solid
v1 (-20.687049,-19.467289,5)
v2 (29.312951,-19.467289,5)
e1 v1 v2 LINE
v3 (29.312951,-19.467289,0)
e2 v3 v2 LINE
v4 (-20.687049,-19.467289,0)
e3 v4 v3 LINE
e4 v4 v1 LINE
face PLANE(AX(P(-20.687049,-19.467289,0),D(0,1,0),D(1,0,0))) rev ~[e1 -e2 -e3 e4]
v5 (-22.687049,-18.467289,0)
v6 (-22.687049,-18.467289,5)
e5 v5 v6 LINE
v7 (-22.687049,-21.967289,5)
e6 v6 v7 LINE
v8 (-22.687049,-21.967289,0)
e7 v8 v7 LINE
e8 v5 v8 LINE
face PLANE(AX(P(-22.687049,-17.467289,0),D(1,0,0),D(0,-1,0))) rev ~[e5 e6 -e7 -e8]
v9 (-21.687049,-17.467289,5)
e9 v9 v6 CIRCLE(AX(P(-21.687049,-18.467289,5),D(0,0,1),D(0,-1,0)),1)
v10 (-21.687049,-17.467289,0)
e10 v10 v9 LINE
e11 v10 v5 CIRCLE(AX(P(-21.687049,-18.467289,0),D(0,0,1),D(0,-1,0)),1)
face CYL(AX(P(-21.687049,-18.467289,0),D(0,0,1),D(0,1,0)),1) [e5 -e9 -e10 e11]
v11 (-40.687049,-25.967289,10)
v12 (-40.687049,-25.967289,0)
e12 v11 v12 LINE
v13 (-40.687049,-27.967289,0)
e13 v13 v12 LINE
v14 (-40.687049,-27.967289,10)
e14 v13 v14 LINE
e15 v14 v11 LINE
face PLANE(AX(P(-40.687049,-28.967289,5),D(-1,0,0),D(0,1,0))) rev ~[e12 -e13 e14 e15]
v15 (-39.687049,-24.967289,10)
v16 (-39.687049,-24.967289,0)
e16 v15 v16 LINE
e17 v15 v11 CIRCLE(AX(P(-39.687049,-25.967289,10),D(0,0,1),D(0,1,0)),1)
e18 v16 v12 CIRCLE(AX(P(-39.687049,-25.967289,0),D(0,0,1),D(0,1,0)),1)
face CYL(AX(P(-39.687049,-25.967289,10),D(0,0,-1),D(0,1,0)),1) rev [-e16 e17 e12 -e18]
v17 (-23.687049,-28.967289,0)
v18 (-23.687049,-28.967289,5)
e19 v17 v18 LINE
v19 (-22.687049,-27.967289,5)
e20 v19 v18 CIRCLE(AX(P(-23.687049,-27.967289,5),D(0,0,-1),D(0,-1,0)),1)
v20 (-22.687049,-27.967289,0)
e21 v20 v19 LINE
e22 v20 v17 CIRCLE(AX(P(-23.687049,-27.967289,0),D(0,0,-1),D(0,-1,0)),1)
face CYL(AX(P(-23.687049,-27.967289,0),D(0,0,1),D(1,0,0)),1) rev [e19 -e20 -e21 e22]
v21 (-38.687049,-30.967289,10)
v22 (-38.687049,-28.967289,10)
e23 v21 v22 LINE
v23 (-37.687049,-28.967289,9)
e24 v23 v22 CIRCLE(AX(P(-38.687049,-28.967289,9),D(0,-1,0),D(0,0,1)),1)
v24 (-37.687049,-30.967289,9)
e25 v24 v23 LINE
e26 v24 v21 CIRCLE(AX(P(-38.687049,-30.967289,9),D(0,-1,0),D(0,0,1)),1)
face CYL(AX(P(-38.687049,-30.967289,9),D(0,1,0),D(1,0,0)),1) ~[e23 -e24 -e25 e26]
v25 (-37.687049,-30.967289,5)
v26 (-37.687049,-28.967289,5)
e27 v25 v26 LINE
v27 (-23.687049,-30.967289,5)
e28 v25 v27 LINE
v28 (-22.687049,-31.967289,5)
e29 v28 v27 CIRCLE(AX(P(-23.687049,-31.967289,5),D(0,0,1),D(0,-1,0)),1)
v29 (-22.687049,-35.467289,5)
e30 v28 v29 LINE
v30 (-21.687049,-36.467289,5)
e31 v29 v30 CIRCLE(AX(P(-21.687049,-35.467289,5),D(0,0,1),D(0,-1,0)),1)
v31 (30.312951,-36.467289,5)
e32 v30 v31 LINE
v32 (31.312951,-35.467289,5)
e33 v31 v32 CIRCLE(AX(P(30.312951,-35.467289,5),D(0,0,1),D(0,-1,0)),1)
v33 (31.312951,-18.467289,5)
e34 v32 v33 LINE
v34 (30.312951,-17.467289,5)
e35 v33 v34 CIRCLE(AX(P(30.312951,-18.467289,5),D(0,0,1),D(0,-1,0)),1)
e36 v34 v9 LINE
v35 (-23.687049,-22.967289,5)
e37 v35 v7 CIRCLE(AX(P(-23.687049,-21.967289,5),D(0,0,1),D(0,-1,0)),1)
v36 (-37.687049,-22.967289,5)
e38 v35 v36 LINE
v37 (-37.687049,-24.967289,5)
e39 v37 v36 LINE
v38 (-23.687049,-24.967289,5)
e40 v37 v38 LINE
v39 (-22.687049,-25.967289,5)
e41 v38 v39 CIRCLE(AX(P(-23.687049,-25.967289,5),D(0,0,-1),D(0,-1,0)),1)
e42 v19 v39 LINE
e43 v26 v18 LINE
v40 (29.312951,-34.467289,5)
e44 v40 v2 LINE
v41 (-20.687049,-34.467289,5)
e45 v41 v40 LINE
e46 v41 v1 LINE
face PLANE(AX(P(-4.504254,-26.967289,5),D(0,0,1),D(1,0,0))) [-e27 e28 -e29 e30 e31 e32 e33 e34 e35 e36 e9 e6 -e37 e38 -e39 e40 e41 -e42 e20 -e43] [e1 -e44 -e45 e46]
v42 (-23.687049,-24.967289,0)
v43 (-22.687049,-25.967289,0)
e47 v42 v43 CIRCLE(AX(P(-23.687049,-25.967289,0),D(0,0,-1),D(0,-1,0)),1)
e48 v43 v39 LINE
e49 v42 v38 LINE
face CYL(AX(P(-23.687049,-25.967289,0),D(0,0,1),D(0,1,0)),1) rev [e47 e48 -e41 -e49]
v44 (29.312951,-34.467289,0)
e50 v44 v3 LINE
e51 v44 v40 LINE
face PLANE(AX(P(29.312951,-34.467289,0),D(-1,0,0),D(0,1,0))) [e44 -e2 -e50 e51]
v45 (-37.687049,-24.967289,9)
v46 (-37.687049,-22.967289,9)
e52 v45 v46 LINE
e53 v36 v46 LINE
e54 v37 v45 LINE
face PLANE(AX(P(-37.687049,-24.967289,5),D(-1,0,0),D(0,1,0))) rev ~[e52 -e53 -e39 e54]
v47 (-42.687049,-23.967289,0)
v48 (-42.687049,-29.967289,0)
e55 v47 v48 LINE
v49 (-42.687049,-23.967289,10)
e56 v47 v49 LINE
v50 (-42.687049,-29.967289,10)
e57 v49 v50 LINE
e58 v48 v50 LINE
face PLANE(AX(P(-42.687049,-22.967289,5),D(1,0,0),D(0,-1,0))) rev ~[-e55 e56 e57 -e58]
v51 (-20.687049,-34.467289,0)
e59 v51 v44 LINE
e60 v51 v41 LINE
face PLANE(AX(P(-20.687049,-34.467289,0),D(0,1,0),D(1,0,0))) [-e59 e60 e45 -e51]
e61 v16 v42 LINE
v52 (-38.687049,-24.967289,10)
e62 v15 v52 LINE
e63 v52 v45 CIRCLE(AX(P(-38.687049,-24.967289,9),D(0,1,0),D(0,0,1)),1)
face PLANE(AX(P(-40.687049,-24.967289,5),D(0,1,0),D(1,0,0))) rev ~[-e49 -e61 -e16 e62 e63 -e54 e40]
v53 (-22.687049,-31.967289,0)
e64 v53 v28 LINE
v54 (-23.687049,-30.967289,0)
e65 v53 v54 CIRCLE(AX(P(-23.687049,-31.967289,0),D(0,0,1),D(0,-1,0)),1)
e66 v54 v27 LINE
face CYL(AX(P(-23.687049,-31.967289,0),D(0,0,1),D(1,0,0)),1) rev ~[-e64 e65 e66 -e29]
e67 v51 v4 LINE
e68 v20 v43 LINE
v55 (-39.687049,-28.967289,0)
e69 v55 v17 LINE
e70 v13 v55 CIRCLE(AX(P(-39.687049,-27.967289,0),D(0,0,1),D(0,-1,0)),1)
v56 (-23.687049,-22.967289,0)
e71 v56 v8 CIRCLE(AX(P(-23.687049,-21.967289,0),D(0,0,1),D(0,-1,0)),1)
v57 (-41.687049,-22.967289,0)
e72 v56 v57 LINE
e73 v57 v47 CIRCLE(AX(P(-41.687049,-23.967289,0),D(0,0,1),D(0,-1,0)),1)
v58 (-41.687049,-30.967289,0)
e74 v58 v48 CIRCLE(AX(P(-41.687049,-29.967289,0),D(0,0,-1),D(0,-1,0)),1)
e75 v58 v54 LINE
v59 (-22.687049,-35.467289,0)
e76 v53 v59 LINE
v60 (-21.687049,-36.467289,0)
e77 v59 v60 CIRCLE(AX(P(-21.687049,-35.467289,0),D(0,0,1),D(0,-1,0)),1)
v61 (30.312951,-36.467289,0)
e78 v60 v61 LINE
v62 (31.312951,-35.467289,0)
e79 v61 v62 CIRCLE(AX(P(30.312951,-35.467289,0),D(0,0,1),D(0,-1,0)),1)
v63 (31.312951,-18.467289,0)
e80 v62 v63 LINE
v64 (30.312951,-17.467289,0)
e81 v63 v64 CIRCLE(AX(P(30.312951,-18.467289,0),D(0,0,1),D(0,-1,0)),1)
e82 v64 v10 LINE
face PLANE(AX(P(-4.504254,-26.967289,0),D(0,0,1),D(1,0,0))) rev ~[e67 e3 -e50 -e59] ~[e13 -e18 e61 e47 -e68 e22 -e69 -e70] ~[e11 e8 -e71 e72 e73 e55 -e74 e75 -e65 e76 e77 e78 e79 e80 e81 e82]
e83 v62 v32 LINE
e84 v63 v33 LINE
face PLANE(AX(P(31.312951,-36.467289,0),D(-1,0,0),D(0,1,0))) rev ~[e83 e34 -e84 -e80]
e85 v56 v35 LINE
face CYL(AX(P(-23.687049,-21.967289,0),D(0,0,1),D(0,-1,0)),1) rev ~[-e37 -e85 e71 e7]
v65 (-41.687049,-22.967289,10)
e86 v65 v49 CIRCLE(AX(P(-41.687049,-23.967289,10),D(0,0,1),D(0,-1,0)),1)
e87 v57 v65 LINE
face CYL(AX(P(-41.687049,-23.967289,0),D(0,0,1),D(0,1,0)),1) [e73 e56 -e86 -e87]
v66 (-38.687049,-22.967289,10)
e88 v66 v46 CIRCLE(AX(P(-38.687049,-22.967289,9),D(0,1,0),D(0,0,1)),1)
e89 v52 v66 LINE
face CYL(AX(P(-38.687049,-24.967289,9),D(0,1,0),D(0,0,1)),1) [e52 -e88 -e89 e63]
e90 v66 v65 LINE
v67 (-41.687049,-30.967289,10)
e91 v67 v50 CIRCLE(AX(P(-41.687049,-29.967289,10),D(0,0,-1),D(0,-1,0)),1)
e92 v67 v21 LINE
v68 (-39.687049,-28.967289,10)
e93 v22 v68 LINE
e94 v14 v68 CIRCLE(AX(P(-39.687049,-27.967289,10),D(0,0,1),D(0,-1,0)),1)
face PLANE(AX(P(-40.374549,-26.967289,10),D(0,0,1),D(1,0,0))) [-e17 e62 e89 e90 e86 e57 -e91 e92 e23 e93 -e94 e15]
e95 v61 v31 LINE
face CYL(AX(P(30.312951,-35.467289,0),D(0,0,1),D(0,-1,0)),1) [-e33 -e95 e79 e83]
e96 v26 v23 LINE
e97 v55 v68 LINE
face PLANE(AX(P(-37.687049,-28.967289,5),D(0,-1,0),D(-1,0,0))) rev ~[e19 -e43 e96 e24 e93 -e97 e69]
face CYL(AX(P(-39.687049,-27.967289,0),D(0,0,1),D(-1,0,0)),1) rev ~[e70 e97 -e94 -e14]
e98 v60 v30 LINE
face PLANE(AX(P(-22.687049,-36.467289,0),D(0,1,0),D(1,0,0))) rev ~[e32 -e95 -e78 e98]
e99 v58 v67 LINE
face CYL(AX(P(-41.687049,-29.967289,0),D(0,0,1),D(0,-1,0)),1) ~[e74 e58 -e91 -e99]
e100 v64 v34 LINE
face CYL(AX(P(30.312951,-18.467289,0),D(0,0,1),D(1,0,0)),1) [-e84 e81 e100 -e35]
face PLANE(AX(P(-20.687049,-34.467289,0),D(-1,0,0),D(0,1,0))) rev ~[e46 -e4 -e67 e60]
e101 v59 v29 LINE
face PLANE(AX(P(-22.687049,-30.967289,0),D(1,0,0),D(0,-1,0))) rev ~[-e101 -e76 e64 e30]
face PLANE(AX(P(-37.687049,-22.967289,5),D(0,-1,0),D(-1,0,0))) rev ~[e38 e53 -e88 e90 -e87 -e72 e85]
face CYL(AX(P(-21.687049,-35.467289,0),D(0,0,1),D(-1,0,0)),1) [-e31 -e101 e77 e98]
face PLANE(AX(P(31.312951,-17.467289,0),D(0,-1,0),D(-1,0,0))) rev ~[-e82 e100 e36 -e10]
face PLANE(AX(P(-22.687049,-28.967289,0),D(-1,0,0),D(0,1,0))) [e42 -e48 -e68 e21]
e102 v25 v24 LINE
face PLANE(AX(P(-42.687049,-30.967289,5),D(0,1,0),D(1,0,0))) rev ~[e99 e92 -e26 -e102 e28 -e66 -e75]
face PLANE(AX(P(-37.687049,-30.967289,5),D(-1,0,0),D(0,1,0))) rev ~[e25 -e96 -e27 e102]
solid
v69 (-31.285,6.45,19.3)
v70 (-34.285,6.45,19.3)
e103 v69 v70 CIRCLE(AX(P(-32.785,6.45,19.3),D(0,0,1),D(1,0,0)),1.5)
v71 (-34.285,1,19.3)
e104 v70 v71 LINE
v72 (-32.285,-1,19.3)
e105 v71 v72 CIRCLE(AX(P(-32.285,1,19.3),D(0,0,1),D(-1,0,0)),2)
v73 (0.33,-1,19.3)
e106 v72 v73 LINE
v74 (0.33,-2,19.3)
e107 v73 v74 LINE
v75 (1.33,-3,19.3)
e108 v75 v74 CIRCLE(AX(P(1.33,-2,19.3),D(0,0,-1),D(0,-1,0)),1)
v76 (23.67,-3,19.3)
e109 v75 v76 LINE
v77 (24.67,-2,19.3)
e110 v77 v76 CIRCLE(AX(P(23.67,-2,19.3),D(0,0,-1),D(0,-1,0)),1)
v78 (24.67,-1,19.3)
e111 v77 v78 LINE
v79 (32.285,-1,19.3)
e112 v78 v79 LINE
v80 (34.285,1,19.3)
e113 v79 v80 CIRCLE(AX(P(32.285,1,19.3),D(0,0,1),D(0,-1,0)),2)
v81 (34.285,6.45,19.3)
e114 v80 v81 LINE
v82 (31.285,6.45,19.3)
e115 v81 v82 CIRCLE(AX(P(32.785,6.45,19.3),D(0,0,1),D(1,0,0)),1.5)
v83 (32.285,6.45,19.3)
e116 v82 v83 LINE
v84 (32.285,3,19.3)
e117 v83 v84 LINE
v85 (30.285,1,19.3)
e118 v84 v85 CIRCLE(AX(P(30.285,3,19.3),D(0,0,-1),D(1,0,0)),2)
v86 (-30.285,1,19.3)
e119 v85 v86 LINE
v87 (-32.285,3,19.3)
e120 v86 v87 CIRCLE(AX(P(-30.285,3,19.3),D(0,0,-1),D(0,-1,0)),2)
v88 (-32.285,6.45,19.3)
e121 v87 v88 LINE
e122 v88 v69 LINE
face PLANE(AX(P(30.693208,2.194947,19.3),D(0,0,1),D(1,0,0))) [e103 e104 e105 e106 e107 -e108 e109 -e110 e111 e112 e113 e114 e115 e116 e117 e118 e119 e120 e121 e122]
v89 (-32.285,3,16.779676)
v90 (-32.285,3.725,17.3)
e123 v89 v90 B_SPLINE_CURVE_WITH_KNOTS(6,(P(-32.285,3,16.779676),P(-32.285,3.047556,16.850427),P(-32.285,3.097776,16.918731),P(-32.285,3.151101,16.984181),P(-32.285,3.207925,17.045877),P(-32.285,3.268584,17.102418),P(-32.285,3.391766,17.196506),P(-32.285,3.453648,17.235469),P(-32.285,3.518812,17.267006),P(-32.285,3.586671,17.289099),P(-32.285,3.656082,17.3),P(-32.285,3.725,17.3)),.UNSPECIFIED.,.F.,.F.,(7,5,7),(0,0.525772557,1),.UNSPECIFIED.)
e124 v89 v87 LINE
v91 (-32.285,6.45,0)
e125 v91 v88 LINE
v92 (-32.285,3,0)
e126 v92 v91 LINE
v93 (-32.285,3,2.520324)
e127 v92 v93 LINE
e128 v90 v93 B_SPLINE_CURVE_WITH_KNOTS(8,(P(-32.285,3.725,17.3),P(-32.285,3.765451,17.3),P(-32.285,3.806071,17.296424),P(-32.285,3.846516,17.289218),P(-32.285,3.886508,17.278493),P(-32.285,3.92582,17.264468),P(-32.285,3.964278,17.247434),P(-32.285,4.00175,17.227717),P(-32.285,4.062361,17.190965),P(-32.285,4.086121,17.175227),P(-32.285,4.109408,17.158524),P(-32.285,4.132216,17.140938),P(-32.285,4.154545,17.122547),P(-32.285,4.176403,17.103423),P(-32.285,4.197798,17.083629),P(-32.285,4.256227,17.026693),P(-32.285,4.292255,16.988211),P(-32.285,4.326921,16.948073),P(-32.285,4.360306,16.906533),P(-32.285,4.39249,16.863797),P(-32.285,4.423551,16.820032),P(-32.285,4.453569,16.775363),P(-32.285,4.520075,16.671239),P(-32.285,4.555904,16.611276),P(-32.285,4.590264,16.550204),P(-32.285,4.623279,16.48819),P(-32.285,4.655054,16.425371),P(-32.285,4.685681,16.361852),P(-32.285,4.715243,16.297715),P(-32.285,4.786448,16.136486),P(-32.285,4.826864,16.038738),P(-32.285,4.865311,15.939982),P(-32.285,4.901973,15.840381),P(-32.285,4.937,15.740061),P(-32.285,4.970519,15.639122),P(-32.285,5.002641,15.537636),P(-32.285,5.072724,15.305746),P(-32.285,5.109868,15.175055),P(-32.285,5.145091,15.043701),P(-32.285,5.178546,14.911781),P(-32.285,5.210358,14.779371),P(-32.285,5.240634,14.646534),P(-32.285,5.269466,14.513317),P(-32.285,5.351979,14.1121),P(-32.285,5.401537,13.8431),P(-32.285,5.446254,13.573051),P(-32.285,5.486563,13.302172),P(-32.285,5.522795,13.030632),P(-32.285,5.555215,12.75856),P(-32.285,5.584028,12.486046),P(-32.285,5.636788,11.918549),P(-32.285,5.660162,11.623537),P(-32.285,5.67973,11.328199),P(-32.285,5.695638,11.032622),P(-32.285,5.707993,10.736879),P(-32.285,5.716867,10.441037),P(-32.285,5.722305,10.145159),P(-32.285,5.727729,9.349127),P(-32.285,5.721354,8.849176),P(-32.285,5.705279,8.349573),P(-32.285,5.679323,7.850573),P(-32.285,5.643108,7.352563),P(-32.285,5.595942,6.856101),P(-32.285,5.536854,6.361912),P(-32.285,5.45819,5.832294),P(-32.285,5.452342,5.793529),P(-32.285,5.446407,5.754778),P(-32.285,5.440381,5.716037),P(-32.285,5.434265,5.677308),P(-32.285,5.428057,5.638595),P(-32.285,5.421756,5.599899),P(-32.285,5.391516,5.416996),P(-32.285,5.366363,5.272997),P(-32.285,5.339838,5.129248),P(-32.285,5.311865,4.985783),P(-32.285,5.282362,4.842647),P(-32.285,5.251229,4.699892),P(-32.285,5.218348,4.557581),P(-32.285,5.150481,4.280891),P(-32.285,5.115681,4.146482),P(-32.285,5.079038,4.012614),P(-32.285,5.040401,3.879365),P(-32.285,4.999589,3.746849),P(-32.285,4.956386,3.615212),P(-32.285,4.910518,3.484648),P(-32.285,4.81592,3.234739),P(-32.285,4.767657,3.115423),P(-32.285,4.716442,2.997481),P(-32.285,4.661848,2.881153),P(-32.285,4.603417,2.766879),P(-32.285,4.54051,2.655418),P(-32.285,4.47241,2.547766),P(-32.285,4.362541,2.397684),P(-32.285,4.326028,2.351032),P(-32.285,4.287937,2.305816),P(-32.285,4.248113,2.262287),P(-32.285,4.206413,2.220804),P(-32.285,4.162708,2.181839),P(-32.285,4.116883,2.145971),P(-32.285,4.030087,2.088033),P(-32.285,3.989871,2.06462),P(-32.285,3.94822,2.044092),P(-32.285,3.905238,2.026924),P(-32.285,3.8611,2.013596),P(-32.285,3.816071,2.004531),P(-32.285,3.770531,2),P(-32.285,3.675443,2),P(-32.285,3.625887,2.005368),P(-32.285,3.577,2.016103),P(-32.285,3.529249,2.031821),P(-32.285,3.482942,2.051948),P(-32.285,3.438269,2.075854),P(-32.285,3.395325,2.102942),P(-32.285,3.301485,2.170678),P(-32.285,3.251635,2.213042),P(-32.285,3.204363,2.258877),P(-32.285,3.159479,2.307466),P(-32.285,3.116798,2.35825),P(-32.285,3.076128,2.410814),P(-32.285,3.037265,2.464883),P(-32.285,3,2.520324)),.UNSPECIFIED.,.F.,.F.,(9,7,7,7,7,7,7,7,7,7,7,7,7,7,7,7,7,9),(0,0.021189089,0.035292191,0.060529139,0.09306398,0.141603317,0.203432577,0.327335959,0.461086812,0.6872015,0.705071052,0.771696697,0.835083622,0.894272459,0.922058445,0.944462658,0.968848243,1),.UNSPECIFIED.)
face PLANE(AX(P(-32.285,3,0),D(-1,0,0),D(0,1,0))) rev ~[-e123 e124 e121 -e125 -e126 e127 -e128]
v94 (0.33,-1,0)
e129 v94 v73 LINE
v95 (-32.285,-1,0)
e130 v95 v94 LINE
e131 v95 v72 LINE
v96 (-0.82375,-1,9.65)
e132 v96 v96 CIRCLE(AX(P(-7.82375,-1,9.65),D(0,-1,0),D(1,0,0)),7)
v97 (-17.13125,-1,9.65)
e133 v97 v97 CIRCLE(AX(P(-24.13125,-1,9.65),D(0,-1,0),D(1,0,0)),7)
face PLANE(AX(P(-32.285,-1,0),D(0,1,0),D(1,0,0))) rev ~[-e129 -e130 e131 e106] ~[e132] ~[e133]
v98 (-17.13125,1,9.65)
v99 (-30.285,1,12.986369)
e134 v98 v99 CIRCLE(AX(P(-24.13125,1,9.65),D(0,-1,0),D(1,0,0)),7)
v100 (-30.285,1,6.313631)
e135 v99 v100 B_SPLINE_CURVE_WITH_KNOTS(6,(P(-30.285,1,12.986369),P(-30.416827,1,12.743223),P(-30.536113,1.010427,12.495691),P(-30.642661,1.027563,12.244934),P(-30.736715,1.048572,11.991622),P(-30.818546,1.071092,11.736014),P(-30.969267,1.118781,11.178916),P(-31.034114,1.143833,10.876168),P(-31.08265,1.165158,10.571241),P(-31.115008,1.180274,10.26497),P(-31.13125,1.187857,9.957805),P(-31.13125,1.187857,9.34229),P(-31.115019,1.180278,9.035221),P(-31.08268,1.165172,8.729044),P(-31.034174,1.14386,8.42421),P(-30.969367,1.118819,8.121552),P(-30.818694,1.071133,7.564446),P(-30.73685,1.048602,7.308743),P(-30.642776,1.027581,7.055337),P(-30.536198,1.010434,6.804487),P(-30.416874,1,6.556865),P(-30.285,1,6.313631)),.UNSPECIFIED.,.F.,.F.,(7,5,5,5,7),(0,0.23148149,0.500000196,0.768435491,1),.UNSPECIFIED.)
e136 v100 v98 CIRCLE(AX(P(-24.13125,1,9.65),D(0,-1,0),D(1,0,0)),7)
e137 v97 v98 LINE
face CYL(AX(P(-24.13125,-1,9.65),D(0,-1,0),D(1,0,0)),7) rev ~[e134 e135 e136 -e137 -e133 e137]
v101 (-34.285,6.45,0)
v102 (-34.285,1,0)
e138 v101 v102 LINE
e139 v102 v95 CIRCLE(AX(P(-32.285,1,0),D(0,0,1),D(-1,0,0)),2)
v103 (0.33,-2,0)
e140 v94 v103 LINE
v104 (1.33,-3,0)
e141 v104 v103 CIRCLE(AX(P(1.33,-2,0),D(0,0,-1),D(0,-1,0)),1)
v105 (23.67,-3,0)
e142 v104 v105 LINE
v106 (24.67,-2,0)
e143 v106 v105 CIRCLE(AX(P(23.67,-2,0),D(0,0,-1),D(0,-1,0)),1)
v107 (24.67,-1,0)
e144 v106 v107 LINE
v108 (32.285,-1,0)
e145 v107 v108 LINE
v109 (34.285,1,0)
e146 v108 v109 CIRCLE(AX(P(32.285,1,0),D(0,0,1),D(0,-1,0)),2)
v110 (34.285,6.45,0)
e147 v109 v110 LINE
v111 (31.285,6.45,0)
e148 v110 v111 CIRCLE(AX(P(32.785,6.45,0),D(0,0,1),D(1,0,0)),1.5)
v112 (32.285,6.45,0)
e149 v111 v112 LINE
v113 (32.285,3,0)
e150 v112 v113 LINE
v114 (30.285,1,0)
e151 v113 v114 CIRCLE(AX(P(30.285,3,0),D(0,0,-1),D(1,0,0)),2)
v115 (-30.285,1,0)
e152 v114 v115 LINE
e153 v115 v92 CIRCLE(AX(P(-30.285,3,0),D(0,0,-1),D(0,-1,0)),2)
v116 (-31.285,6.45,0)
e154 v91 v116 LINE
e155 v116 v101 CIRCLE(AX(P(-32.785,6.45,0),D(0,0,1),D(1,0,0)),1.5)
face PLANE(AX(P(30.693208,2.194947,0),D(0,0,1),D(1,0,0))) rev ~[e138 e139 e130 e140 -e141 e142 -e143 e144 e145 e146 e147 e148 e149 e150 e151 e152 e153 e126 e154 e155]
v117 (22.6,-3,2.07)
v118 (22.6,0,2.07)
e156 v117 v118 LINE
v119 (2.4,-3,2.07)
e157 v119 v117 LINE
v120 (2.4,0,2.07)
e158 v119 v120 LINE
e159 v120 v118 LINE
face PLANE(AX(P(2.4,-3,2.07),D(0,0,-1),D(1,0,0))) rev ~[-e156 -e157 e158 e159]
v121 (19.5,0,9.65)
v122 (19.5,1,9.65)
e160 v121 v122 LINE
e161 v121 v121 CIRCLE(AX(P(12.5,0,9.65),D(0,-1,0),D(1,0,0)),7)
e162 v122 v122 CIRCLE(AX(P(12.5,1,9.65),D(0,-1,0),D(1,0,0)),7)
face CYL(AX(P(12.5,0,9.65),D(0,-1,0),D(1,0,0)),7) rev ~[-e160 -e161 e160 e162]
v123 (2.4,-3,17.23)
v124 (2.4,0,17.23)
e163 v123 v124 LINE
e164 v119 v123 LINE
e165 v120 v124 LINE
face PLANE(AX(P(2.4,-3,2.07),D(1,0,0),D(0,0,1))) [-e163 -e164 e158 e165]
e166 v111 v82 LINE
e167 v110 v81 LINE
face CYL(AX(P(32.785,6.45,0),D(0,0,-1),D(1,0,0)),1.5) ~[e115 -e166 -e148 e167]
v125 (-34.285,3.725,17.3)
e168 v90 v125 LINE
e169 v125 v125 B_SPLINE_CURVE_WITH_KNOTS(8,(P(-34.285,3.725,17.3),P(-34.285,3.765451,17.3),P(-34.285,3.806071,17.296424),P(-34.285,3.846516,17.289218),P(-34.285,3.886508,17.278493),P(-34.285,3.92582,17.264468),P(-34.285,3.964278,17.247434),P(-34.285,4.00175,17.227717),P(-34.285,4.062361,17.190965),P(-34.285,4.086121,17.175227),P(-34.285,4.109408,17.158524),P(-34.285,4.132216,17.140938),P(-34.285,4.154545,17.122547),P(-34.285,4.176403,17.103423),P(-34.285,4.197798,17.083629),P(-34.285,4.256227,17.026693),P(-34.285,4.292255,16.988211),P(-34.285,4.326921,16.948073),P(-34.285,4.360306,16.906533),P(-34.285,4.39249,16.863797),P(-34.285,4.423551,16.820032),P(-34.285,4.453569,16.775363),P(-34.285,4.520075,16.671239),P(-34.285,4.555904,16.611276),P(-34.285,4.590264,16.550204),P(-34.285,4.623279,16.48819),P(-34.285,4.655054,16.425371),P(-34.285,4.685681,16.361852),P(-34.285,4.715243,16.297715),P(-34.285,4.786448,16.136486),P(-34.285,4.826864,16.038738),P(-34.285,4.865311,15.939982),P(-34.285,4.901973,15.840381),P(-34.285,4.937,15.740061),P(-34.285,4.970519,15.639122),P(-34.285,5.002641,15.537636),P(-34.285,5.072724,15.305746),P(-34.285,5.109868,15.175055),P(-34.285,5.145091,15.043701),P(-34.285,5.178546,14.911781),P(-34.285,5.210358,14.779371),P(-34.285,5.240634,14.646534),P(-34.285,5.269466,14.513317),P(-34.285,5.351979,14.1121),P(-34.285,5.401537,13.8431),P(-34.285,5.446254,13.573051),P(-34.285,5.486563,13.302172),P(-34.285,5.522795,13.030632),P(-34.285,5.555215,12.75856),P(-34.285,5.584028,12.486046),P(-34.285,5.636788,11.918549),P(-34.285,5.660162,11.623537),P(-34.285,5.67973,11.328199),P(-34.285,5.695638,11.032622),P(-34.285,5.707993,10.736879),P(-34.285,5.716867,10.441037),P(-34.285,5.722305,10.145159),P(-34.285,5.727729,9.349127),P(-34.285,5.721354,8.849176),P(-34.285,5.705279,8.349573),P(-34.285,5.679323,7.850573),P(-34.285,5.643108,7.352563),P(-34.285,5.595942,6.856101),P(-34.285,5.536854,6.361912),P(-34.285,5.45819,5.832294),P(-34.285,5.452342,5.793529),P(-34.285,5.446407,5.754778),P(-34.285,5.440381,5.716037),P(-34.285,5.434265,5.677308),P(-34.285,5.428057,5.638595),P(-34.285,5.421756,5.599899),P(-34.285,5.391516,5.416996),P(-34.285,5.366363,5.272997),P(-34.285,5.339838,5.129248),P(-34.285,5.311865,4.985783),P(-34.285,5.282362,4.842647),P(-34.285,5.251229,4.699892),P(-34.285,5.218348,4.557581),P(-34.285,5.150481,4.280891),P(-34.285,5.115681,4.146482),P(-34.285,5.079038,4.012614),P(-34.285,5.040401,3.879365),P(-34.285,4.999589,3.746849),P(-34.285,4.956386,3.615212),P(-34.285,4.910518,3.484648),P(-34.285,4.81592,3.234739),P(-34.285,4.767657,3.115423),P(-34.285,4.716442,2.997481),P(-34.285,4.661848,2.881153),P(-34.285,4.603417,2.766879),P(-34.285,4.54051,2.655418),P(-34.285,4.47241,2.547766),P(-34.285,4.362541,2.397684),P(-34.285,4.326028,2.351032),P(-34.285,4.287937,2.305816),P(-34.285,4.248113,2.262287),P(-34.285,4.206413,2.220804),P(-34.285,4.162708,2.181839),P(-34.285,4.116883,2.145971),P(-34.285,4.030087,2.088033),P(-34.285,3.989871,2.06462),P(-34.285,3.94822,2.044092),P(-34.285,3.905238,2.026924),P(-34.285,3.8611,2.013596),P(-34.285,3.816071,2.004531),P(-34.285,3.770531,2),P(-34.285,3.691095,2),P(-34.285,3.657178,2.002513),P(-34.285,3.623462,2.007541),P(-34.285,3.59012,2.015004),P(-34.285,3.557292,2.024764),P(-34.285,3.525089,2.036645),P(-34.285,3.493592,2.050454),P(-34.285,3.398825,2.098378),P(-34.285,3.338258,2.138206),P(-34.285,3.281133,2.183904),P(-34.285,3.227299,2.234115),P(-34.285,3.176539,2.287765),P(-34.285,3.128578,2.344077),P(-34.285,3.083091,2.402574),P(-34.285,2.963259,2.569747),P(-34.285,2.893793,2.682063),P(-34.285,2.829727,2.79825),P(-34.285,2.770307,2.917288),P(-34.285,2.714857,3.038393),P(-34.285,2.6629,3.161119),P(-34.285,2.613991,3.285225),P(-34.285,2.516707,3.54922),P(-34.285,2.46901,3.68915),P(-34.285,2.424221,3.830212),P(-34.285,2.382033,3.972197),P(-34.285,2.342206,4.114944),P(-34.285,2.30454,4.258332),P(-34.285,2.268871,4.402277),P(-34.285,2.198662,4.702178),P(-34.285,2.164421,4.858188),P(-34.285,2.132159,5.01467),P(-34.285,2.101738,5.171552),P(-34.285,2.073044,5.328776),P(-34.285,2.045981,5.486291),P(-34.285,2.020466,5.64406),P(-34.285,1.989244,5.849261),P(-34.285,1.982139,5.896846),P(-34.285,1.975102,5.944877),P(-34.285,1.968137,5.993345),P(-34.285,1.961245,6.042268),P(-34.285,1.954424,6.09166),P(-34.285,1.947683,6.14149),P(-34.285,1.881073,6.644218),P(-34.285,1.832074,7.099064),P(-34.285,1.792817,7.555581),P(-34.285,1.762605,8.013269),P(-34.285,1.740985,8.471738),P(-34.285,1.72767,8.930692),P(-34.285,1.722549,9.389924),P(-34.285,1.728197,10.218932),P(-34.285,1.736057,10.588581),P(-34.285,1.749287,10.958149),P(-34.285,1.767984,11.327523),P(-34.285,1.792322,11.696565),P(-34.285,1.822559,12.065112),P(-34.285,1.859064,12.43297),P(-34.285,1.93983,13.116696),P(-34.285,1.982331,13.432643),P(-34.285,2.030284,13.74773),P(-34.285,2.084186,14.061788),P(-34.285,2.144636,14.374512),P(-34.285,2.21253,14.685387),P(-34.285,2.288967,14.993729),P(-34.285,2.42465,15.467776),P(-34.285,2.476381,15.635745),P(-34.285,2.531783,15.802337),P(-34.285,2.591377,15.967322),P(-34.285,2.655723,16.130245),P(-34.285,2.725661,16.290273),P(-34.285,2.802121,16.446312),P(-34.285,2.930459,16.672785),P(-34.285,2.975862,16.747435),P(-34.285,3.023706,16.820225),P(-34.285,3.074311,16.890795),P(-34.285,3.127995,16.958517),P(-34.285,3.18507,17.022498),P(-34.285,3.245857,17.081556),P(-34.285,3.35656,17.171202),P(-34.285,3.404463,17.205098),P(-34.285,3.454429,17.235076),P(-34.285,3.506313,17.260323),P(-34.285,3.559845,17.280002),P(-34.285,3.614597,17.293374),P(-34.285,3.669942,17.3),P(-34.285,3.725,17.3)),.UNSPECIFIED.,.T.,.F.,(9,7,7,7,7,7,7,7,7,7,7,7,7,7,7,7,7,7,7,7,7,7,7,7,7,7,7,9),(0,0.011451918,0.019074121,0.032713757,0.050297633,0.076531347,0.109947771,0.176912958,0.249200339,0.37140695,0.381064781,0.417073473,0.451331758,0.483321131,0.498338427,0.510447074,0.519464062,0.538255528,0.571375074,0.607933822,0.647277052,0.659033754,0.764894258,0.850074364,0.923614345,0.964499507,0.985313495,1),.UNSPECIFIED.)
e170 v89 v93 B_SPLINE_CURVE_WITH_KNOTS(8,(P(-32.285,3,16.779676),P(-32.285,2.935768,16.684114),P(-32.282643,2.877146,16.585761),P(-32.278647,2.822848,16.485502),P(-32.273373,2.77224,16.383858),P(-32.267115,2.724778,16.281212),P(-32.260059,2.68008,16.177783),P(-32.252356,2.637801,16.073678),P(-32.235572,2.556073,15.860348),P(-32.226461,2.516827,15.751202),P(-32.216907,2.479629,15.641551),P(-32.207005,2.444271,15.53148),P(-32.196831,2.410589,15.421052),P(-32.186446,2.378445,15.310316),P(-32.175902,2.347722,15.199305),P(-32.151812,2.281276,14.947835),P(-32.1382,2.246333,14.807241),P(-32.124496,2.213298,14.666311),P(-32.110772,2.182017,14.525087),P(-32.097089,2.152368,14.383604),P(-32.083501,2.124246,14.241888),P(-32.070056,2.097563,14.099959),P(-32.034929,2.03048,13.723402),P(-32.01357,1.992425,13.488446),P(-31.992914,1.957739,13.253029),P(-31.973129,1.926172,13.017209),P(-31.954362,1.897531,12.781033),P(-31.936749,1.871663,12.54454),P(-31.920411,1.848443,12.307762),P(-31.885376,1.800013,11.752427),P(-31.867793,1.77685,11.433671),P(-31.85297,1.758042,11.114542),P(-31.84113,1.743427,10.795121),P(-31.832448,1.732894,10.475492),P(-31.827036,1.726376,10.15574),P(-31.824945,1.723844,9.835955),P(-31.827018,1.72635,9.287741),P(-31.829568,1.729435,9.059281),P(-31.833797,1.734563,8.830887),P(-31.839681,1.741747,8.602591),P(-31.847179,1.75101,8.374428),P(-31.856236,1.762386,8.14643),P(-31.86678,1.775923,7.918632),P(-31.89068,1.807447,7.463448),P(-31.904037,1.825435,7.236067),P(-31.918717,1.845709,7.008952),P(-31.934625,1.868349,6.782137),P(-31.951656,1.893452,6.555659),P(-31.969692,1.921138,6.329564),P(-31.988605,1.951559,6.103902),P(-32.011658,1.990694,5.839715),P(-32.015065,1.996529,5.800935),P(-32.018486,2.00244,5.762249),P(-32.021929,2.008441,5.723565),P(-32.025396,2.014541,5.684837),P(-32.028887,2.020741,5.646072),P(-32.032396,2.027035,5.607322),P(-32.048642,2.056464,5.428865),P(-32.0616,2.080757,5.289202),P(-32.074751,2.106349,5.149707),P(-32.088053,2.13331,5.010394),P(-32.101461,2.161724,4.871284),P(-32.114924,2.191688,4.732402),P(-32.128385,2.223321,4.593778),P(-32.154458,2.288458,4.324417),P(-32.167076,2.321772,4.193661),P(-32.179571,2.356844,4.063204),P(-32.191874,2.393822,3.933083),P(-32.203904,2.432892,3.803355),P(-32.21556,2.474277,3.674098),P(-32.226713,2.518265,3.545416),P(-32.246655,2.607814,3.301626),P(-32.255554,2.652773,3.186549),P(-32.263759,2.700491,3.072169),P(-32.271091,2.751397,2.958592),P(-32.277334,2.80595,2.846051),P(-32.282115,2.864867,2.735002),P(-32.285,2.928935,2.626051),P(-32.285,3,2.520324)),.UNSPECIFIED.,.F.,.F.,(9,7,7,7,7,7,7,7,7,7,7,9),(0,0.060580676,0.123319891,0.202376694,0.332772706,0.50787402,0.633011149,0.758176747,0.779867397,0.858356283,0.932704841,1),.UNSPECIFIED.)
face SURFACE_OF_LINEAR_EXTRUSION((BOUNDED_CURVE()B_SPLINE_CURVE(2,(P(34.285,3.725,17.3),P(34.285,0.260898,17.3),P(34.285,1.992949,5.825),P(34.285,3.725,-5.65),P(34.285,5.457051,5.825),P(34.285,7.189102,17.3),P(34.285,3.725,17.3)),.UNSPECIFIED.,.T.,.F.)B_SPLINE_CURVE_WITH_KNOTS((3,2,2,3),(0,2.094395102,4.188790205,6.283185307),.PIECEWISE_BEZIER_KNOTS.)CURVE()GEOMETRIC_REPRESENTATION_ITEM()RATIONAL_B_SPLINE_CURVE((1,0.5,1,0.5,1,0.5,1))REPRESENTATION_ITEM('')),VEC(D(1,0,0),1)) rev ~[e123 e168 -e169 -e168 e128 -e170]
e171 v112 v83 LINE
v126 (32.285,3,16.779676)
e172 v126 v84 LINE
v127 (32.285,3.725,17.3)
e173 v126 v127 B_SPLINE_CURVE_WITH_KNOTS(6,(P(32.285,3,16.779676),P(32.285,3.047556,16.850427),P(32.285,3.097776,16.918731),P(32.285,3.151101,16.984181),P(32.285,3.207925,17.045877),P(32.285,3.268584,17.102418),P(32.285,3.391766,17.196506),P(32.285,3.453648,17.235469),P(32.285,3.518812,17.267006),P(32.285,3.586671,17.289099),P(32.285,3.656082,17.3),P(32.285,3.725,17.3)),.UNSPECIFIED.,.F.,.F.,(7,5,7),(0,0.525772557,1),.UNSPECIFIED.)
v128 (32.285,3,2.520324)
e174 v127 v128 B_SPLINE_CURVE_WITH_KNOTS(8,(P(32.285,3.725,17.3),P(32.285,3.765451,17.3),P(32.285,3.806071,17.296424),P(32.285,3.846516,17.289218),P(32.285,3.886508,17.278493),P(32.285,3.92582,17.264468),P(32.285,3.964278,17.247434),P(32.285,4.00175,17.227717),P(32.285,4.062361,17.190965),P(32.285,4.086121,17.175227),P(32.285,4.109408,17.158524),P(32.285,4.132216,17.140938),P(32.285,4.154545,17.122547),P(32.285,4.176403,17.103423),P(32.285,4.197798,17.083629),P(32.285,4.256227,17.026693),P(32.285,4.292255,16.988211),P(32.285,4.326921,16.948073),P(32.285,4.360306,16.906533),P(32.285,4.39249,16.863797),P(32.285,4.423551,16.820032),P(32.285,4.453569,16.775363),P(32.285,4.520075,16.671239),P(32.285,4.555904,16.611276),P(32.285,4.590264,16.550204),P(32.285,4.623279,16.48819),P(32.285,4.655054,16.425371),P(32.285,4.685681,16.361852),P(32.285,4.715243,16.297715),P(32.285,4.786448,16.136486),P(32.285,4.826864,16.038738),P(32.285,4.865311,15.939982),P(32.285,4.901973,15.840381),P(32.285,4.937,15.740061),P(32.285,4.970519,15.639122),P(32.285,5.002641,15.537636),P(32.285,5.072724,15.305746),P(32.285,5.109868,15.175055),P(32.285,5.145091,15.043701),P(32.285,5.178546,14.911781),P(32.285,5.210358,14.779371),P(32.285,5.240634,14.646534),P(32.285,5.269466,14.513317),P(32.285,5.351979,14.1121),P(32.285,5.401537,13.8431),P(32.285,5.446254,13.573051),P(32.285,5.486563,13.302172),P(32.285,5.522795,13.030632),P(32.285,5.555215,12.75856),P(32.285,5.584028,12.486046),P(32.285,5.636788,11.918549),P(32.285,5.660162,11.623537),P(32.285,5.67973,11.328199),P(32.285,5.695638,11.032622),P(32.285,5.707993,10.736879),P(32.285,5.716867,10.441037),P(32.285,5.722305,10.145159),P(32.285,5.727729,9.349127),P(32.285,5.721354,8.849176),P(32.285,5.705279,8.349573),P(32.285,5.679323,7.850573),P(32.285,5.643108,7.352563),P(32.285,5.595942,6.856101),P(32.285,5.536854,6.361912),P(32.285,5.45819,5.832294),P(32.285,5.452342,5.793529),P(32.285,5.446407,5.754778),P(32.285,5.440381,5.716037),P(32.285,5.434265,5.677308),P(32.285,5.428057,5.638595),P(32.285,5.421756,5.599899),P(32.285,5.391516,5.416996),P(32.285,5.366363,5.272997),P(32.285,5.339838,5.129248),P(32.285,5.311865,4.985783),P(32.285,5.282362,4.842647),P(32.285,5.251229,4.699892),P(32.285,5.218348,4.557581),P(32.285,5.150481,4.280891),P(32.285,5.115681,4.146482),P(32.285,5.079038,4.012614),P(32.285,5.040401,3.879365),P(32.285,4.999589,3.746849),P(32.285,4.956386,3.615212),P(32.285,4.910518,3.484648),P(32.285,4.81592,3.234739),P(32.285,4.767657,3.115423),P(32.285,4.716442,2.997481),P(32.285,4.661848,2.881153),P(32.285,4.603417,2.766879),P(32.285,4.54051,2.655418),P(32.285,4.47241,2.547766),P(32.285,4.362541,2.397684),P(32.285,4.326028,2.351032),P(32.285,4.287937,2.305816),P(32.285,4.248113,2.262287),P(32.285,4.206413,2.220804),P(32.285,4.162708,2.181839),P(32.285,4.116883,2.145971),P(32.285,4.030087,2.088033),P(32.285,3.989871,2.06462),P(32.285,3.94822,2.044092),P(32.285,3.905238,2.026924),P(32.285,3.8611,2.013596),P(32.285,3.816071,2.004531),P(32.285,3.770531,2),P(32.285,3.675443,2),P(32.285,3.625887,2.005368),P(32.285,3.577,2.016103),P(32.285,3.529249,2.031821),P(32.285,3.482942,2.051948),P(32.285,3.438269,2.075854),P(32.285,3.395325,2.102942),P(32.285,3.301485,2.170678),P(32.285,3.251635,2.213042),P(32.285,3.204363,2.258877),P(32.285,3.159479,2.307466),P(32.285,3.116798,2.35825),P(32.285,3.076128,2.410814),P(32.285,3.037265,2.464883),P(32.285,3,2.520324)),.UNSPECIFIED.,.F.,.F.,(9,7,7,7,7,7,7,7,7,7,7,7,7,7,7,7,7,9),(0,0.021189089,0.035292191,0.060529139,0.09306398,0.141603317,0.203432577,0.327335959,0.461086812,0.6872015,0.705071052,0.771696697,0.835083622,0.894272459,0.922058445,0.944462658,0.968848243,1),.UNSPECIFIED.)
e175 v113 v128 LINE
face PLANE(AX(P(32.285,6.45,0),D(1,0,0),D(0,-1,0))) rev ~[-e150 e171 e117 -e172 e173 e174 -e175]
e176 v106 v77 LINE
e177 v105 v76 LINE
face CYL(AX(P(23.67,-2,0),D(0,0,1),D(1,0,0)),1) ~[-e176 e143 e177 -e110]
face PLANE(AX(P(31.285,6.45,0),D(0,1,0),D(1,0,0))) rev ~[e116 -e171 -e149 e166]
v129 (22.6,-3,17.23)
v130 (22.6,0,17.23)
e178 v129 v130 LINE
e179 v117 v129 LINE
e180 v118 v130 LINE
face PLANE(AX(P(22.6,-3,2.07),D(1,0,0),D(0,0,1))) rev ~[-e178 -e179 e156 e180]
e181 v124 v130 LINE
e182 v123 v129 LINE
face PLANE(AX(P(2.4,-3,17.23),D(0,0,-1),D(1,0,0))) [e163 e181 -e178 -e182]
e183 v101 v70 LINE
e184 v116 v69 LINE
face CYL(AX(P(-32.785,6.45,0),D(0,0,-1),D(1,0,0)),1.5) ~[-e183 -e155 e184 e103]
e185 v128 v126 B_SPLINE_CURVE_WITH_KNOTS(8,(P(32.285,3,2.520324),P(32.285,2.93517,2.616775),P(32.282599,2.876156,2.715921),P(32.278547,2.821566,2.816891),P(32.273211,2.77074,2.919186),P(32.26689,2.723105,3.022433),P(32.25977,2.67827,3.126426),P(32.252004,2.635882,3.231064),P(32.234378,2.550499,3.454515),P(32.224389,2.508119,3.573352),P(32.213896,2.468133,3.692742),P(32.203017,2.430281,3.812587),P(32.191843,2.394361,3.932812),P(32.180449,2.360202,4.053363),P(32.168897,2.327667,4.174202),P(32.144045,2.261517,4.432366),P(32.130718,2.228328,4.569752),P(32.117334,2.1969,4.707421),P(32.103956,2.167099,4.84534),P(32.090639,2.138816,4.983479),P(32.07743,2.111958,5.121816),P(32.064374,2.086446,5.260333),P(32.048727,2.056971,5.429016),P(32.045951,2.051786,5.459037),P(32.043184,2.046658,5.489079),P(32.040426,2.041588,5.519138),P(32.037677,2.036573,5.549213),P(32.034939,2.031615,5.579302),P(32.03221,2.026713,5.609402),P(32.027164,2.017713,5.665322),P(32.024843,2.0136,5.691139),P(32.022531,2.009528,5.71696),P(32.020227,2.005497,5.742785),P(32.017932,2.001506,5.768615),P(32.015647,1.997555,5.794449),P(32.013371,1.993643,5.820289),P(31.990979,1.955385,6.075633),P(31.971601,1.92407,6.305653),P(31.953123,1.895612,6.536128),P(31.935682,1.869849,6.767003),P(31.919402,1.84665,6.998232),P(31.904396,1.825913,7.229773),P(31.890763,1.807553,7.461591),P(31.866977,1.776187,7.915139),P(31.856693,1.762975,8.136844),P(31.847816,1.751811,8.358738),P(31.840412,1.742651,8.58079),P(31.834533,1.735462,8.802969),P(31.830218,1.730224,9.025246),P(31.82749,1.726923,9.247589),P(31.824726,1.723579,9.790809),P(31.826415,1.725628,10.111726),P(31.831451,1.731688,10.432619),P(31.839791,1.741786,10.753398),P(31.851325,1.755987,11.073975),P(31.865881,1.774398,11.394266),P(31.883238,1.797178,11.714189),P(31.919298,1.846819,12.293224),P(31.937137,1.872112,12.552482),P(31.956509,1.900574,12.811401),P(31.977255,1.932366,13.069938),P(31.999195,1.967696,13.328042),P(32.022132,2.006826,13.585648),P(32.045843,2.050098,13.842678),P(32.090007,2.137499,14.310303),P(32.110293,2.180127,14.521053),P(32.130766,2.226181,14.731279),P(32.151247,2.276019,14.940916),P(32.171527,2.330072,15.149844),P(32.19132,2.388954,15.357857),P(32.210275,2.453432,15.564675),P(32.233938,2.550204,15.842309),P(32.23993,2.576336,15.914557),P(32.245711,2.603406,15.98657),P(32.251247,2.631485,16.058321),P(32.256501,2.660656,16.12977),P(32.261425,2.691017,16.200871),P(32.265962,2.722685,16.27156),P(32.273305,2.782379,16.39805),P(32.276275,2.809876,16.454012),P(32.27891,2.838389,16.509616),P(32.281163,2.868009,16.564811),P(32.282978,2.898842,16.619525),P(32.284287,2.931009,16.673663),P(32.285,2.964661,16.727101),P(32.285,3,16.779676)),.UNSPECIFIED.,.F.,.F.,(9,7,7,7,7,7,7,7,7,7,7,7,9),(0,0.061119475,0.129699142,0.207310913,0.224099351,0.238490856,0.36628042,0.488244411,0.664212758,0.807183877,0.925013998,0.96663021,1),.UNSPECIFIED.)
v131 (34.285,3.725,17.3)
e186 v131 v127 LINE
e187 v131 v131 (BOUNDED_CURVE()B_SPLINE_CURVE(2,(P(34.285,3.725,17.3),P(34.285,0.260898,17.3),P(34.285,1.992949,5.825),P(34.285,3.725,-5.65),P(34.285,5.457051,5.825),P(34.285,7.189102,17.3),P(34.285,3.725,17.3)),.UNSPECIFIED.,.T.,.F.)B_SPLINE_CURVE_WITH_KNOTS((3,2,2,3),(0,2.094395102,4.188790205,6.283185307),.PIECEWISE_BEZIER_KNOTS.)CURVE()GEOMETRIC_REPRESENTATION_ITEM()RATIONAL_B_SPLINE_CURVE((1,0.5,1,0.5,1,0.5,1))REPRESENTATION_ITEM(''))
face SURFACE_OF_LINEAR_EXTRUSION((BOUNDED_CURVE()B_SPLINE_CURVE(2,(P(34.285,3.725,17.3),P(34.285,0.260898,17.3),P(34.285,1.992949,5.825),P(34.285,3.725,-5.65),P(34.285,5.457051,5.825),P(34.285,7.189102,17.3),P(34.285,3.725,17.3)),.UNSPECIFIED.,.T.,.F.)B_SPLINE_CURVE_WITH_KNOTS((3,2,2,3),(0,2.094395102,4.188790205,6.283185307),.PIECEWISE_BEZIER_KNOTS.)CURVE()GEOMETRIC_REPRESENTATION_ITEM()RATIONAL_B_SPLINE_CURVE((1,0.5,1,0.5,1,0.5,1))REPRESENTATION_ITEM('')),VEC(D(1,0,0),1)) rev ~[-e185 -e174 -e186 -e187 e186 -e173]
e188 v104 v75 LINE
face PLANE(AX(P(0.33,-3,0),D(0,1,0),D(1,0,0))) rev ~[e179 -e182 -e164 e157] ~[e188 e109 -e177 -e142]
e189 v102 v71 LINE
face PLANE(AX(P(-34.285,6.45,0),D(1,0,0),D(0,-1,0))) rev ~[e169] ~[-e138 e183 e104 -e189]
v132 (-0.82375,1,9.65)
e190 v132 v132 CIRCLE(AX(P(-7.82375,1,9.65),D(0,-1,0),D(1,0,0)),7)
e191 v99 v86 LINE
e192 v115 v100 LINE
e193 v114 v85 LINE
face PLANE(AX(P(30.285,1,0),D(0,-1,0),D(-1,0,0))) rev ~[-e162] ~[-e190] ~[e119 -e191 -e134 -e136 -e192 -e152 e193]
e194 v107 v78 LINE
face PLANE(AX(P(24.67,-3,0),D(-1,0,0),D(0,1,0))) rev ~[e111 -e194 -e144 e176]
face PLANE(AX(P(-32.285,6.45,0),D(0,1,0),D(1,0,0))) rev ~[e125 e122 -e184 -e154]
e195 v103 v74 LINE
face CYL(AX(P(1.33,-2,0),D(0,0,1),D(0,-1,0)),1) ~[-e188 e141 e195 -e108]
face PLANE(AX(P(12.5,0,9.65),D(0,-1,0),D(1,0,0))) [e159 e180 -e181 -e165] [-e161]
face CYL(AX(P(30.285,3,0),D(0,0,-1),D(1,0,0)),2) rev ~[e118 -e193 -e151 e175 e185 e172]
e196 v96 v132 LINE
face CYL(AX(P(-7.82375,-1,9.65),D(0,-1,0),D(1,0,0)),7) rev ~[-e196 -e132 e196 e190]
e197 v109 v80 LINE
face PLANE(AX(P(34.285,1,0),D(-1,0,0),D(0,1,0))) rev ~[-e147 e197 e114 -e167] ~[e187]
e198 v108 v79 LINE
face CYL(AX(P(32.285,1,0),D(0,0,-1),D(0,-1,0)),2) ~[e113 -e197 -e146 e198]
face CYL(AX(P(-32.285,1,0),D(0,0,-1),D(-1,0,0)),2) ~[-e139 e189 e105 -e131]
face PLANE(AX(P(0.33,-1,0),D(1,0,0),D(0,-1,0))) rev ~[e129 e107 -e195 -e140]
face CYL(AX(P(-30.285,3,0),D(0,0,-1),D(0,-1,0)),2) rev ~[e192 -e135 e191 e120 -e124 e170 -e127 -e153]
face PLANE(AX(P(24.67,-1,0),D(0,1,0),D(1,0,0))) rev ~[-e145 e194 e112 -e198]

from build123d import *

# Parameters (mm, degrees)
F2_DEPTH  = 19.3
F5_DEPTH  = 68.571
F7_R      = 1
F6_W      = 18
F6_H      = 4
F6_W_2    = 50
F6_H_2    = 15
F8_DEPTH  = 5
F10_DEPTH = 5
F11_R     = 1
F3_W      = 20.2
F3_H      = 15.16
F12_DEPTH = 3
F13_R     = 7
F14_R     = 7
F15_DEPTH = 8.951


with BuildPart() as f2:
    # F1 (on Top) → F2 (new body)
    with BuildSketch(Plane.XY):
        with BuildLine():
            Line((24.67, -1), (32.285, -1))
            ThreePointArc((32.285, -1), (33.6992135624, -0.4142135624), (34.285, 1))
            Line((34.285, 1), (34.285, 6.45))
            ThreePointArc((34.285, 6.45), (32.785, 7.95), (31.285, 6.45))
            Line((31.285, 6.45), (32.285, 6.45))
            Line((32.285, 6.45), (32.285, 3))
            ThreePointArc((32.285, 3), (31.6992135624, 1.5857864376), (30.285, 1))
            Line((30.285, 1), (24.67, 1))
            Line((24.67, 1), (24.67, -1))
        make_face()
        Polygon((24.67, -3), (24.67, -1), (24.67, 1), (12.17, 1), (0.33, 1), (0.33, -1), (0.33, -3), align=None)
        with BuildLine():
            Line((0.33, -1), (0.33, 1))
            Line((0.33, 1), (-12.17, 1))
            Line((-12.17, 1), (-30.285, 1))
            ThreePointArc((-30.285, 1), (-31.6992135624, 1.5857864376), (-32.285, 3))
            Line((-32.285, 3), (-32.285, 6.45))
            Line((-32.285, 6.45), (-31.285, 6.45))
            ThreePointArc((-31.285, 6.45), (-32.785, 7.95), (-34.285, 6.45))
            Line((-34.285, 6.45), (-34.285, 1))
            ThreePointArc((-34.285, 1), (-33.6992135624, -0.4142135624), (-32.285, -1))
            Line((-32.285, -1), (-12.17, -1))
            Line((-12.17, -1), (0.33, -1))
        make_face()
    extrude(amount=F2_DEPTH)

    # F4 (on face) → F5 (cut, through all)
    with BuildSketch(Plane.YZ.offset(34.285)):
        with BuildLine():
            add(Edge.make_bspline(
                [(3.725, 17.3), (0.2608983849, 17.3), (1.9929491924, 5.825), (3.725, -5.65), (5.4570508076, 5.825), (7.1891016151, 17.3), (3.725, 17.3)],
                knots=[0, 0, 0, 2.0943951024, 2.0943951024, 4.1887902048, 4.1887902048, 6.2831853072, 6.2831853072, 6.2831853072], degree=2, weights=[1, 0.5, 1, 0.5, 1, 0.5, 1]))
        make_face()
    extrude(amount=-F5_DEPTH, mode=Mode.SUBTRACT)

    # F7
    f7_edges = [f2.edges().sort_by_distance(p)[0] for p in [
        (0.33, -3, 9.65),
        (24.67, -3, 9.65),
    ]]
    fillet(f7_edges, radius=F7_R)

    # F3 (on face) → F12 (cut)
    with BuildSketch(Plane.XZ.offset(3)):
        with Locations((12.5, 9.65)):
            Rectangle(F3_W, F3_H)
    extrude(amount=-F12_DEPTH, mode=Mode.SUBTRACT)

    # F13 (on face) + F14 (on face) → F15 (cut, through all)
    with BuildSketch(Plane.XZ.offset(1)):
        with Locations((-24.13125, 9.65)):
            Circle(F13_R)
        with Locations((-7.82375, 9.65)):
            Circle(F13_R)
    with BuildSketch(Plane.XZ):
        with Locations((12.5, 9.65)):
            Circle(F14_R)
    extrude(amount=-F15_DEPTH, mode=Mode.SUBTRACT)


with BuildPart() as f8:
    # F6 (on Top) → F8 (new body)
    with BuildSketch(Plane.XY):
        Polygon((-22.6870492548, -30.9672894628), (-22.6870492548, -36.4672894628), (31.3129507452, -36.4672894628), (31.3129507452, -17.4672894628), (-22.6870492548, -17.4672894628), (-22.6870492548, -22.9672894628), (-42.6870492548, -22.9672894628), (-42.6870492548, -30.9672894628), align=None)
        with Locations((-31.6870492548, -26.9672894628)):
            Rectangle(F6_W, F6_H, mode=Mode.SUBTRACT)
        with Locations((4.3129507452, -26.9672894628)):
            Rectangle(F6_W_2, F6_H_2, mode=Mode.SUBTRACT)
    extrude(amount=F8_DEPTH)

    # F9 (on face) → F10 (join)
    with BuildSketch(Plane.XY.offset(5)):
        Polygon((-37.6870492548, -22.9672894628), (-42.6870492548, -22.9672894628), (-42.6870492548, -30.9672894628), (-37.6870492548, -30.9672894628), (-37.6870492548, -28.9672894628), (-40.6870492548, -28.9672894628), (-40.6870492548, -24.9672894628), (-37.6870492548, -24.9672894628), align=None)
    extrude(amount=F10_DEPTH)

    # F11
    f11_edges = [f8.edges().sort_by_distance(p)[0] for p in [
        (-37.687049, -29.967289, 10),
        (-37.687049, -23.967289, 10),
        (-22.687049, -36.467289, 2.5),
        (31.312951, -36.467289, 2.5),
        (31.312951, -17.467289, 2.5),
        (-42.687049, -30.967289, 5),
        (-42.687049, -22.967289, 5),
        (-22.687049, -22.967289, 2.5),
        (-22.687049, -17.467289, 2.5),
        (-22.687049, -30.967289, 2.5),
        (-40.687049, -24.967289, 5),
        (-40.687049, -28.967289, 5),
        (-22.687049, -24.967289, 2.5),
        (-22.687049, -28.967289, 2.5),
    ]]
    fillet(f11_edges, radius=F11_R)


solid = Compound([f2.part, f8.part])
